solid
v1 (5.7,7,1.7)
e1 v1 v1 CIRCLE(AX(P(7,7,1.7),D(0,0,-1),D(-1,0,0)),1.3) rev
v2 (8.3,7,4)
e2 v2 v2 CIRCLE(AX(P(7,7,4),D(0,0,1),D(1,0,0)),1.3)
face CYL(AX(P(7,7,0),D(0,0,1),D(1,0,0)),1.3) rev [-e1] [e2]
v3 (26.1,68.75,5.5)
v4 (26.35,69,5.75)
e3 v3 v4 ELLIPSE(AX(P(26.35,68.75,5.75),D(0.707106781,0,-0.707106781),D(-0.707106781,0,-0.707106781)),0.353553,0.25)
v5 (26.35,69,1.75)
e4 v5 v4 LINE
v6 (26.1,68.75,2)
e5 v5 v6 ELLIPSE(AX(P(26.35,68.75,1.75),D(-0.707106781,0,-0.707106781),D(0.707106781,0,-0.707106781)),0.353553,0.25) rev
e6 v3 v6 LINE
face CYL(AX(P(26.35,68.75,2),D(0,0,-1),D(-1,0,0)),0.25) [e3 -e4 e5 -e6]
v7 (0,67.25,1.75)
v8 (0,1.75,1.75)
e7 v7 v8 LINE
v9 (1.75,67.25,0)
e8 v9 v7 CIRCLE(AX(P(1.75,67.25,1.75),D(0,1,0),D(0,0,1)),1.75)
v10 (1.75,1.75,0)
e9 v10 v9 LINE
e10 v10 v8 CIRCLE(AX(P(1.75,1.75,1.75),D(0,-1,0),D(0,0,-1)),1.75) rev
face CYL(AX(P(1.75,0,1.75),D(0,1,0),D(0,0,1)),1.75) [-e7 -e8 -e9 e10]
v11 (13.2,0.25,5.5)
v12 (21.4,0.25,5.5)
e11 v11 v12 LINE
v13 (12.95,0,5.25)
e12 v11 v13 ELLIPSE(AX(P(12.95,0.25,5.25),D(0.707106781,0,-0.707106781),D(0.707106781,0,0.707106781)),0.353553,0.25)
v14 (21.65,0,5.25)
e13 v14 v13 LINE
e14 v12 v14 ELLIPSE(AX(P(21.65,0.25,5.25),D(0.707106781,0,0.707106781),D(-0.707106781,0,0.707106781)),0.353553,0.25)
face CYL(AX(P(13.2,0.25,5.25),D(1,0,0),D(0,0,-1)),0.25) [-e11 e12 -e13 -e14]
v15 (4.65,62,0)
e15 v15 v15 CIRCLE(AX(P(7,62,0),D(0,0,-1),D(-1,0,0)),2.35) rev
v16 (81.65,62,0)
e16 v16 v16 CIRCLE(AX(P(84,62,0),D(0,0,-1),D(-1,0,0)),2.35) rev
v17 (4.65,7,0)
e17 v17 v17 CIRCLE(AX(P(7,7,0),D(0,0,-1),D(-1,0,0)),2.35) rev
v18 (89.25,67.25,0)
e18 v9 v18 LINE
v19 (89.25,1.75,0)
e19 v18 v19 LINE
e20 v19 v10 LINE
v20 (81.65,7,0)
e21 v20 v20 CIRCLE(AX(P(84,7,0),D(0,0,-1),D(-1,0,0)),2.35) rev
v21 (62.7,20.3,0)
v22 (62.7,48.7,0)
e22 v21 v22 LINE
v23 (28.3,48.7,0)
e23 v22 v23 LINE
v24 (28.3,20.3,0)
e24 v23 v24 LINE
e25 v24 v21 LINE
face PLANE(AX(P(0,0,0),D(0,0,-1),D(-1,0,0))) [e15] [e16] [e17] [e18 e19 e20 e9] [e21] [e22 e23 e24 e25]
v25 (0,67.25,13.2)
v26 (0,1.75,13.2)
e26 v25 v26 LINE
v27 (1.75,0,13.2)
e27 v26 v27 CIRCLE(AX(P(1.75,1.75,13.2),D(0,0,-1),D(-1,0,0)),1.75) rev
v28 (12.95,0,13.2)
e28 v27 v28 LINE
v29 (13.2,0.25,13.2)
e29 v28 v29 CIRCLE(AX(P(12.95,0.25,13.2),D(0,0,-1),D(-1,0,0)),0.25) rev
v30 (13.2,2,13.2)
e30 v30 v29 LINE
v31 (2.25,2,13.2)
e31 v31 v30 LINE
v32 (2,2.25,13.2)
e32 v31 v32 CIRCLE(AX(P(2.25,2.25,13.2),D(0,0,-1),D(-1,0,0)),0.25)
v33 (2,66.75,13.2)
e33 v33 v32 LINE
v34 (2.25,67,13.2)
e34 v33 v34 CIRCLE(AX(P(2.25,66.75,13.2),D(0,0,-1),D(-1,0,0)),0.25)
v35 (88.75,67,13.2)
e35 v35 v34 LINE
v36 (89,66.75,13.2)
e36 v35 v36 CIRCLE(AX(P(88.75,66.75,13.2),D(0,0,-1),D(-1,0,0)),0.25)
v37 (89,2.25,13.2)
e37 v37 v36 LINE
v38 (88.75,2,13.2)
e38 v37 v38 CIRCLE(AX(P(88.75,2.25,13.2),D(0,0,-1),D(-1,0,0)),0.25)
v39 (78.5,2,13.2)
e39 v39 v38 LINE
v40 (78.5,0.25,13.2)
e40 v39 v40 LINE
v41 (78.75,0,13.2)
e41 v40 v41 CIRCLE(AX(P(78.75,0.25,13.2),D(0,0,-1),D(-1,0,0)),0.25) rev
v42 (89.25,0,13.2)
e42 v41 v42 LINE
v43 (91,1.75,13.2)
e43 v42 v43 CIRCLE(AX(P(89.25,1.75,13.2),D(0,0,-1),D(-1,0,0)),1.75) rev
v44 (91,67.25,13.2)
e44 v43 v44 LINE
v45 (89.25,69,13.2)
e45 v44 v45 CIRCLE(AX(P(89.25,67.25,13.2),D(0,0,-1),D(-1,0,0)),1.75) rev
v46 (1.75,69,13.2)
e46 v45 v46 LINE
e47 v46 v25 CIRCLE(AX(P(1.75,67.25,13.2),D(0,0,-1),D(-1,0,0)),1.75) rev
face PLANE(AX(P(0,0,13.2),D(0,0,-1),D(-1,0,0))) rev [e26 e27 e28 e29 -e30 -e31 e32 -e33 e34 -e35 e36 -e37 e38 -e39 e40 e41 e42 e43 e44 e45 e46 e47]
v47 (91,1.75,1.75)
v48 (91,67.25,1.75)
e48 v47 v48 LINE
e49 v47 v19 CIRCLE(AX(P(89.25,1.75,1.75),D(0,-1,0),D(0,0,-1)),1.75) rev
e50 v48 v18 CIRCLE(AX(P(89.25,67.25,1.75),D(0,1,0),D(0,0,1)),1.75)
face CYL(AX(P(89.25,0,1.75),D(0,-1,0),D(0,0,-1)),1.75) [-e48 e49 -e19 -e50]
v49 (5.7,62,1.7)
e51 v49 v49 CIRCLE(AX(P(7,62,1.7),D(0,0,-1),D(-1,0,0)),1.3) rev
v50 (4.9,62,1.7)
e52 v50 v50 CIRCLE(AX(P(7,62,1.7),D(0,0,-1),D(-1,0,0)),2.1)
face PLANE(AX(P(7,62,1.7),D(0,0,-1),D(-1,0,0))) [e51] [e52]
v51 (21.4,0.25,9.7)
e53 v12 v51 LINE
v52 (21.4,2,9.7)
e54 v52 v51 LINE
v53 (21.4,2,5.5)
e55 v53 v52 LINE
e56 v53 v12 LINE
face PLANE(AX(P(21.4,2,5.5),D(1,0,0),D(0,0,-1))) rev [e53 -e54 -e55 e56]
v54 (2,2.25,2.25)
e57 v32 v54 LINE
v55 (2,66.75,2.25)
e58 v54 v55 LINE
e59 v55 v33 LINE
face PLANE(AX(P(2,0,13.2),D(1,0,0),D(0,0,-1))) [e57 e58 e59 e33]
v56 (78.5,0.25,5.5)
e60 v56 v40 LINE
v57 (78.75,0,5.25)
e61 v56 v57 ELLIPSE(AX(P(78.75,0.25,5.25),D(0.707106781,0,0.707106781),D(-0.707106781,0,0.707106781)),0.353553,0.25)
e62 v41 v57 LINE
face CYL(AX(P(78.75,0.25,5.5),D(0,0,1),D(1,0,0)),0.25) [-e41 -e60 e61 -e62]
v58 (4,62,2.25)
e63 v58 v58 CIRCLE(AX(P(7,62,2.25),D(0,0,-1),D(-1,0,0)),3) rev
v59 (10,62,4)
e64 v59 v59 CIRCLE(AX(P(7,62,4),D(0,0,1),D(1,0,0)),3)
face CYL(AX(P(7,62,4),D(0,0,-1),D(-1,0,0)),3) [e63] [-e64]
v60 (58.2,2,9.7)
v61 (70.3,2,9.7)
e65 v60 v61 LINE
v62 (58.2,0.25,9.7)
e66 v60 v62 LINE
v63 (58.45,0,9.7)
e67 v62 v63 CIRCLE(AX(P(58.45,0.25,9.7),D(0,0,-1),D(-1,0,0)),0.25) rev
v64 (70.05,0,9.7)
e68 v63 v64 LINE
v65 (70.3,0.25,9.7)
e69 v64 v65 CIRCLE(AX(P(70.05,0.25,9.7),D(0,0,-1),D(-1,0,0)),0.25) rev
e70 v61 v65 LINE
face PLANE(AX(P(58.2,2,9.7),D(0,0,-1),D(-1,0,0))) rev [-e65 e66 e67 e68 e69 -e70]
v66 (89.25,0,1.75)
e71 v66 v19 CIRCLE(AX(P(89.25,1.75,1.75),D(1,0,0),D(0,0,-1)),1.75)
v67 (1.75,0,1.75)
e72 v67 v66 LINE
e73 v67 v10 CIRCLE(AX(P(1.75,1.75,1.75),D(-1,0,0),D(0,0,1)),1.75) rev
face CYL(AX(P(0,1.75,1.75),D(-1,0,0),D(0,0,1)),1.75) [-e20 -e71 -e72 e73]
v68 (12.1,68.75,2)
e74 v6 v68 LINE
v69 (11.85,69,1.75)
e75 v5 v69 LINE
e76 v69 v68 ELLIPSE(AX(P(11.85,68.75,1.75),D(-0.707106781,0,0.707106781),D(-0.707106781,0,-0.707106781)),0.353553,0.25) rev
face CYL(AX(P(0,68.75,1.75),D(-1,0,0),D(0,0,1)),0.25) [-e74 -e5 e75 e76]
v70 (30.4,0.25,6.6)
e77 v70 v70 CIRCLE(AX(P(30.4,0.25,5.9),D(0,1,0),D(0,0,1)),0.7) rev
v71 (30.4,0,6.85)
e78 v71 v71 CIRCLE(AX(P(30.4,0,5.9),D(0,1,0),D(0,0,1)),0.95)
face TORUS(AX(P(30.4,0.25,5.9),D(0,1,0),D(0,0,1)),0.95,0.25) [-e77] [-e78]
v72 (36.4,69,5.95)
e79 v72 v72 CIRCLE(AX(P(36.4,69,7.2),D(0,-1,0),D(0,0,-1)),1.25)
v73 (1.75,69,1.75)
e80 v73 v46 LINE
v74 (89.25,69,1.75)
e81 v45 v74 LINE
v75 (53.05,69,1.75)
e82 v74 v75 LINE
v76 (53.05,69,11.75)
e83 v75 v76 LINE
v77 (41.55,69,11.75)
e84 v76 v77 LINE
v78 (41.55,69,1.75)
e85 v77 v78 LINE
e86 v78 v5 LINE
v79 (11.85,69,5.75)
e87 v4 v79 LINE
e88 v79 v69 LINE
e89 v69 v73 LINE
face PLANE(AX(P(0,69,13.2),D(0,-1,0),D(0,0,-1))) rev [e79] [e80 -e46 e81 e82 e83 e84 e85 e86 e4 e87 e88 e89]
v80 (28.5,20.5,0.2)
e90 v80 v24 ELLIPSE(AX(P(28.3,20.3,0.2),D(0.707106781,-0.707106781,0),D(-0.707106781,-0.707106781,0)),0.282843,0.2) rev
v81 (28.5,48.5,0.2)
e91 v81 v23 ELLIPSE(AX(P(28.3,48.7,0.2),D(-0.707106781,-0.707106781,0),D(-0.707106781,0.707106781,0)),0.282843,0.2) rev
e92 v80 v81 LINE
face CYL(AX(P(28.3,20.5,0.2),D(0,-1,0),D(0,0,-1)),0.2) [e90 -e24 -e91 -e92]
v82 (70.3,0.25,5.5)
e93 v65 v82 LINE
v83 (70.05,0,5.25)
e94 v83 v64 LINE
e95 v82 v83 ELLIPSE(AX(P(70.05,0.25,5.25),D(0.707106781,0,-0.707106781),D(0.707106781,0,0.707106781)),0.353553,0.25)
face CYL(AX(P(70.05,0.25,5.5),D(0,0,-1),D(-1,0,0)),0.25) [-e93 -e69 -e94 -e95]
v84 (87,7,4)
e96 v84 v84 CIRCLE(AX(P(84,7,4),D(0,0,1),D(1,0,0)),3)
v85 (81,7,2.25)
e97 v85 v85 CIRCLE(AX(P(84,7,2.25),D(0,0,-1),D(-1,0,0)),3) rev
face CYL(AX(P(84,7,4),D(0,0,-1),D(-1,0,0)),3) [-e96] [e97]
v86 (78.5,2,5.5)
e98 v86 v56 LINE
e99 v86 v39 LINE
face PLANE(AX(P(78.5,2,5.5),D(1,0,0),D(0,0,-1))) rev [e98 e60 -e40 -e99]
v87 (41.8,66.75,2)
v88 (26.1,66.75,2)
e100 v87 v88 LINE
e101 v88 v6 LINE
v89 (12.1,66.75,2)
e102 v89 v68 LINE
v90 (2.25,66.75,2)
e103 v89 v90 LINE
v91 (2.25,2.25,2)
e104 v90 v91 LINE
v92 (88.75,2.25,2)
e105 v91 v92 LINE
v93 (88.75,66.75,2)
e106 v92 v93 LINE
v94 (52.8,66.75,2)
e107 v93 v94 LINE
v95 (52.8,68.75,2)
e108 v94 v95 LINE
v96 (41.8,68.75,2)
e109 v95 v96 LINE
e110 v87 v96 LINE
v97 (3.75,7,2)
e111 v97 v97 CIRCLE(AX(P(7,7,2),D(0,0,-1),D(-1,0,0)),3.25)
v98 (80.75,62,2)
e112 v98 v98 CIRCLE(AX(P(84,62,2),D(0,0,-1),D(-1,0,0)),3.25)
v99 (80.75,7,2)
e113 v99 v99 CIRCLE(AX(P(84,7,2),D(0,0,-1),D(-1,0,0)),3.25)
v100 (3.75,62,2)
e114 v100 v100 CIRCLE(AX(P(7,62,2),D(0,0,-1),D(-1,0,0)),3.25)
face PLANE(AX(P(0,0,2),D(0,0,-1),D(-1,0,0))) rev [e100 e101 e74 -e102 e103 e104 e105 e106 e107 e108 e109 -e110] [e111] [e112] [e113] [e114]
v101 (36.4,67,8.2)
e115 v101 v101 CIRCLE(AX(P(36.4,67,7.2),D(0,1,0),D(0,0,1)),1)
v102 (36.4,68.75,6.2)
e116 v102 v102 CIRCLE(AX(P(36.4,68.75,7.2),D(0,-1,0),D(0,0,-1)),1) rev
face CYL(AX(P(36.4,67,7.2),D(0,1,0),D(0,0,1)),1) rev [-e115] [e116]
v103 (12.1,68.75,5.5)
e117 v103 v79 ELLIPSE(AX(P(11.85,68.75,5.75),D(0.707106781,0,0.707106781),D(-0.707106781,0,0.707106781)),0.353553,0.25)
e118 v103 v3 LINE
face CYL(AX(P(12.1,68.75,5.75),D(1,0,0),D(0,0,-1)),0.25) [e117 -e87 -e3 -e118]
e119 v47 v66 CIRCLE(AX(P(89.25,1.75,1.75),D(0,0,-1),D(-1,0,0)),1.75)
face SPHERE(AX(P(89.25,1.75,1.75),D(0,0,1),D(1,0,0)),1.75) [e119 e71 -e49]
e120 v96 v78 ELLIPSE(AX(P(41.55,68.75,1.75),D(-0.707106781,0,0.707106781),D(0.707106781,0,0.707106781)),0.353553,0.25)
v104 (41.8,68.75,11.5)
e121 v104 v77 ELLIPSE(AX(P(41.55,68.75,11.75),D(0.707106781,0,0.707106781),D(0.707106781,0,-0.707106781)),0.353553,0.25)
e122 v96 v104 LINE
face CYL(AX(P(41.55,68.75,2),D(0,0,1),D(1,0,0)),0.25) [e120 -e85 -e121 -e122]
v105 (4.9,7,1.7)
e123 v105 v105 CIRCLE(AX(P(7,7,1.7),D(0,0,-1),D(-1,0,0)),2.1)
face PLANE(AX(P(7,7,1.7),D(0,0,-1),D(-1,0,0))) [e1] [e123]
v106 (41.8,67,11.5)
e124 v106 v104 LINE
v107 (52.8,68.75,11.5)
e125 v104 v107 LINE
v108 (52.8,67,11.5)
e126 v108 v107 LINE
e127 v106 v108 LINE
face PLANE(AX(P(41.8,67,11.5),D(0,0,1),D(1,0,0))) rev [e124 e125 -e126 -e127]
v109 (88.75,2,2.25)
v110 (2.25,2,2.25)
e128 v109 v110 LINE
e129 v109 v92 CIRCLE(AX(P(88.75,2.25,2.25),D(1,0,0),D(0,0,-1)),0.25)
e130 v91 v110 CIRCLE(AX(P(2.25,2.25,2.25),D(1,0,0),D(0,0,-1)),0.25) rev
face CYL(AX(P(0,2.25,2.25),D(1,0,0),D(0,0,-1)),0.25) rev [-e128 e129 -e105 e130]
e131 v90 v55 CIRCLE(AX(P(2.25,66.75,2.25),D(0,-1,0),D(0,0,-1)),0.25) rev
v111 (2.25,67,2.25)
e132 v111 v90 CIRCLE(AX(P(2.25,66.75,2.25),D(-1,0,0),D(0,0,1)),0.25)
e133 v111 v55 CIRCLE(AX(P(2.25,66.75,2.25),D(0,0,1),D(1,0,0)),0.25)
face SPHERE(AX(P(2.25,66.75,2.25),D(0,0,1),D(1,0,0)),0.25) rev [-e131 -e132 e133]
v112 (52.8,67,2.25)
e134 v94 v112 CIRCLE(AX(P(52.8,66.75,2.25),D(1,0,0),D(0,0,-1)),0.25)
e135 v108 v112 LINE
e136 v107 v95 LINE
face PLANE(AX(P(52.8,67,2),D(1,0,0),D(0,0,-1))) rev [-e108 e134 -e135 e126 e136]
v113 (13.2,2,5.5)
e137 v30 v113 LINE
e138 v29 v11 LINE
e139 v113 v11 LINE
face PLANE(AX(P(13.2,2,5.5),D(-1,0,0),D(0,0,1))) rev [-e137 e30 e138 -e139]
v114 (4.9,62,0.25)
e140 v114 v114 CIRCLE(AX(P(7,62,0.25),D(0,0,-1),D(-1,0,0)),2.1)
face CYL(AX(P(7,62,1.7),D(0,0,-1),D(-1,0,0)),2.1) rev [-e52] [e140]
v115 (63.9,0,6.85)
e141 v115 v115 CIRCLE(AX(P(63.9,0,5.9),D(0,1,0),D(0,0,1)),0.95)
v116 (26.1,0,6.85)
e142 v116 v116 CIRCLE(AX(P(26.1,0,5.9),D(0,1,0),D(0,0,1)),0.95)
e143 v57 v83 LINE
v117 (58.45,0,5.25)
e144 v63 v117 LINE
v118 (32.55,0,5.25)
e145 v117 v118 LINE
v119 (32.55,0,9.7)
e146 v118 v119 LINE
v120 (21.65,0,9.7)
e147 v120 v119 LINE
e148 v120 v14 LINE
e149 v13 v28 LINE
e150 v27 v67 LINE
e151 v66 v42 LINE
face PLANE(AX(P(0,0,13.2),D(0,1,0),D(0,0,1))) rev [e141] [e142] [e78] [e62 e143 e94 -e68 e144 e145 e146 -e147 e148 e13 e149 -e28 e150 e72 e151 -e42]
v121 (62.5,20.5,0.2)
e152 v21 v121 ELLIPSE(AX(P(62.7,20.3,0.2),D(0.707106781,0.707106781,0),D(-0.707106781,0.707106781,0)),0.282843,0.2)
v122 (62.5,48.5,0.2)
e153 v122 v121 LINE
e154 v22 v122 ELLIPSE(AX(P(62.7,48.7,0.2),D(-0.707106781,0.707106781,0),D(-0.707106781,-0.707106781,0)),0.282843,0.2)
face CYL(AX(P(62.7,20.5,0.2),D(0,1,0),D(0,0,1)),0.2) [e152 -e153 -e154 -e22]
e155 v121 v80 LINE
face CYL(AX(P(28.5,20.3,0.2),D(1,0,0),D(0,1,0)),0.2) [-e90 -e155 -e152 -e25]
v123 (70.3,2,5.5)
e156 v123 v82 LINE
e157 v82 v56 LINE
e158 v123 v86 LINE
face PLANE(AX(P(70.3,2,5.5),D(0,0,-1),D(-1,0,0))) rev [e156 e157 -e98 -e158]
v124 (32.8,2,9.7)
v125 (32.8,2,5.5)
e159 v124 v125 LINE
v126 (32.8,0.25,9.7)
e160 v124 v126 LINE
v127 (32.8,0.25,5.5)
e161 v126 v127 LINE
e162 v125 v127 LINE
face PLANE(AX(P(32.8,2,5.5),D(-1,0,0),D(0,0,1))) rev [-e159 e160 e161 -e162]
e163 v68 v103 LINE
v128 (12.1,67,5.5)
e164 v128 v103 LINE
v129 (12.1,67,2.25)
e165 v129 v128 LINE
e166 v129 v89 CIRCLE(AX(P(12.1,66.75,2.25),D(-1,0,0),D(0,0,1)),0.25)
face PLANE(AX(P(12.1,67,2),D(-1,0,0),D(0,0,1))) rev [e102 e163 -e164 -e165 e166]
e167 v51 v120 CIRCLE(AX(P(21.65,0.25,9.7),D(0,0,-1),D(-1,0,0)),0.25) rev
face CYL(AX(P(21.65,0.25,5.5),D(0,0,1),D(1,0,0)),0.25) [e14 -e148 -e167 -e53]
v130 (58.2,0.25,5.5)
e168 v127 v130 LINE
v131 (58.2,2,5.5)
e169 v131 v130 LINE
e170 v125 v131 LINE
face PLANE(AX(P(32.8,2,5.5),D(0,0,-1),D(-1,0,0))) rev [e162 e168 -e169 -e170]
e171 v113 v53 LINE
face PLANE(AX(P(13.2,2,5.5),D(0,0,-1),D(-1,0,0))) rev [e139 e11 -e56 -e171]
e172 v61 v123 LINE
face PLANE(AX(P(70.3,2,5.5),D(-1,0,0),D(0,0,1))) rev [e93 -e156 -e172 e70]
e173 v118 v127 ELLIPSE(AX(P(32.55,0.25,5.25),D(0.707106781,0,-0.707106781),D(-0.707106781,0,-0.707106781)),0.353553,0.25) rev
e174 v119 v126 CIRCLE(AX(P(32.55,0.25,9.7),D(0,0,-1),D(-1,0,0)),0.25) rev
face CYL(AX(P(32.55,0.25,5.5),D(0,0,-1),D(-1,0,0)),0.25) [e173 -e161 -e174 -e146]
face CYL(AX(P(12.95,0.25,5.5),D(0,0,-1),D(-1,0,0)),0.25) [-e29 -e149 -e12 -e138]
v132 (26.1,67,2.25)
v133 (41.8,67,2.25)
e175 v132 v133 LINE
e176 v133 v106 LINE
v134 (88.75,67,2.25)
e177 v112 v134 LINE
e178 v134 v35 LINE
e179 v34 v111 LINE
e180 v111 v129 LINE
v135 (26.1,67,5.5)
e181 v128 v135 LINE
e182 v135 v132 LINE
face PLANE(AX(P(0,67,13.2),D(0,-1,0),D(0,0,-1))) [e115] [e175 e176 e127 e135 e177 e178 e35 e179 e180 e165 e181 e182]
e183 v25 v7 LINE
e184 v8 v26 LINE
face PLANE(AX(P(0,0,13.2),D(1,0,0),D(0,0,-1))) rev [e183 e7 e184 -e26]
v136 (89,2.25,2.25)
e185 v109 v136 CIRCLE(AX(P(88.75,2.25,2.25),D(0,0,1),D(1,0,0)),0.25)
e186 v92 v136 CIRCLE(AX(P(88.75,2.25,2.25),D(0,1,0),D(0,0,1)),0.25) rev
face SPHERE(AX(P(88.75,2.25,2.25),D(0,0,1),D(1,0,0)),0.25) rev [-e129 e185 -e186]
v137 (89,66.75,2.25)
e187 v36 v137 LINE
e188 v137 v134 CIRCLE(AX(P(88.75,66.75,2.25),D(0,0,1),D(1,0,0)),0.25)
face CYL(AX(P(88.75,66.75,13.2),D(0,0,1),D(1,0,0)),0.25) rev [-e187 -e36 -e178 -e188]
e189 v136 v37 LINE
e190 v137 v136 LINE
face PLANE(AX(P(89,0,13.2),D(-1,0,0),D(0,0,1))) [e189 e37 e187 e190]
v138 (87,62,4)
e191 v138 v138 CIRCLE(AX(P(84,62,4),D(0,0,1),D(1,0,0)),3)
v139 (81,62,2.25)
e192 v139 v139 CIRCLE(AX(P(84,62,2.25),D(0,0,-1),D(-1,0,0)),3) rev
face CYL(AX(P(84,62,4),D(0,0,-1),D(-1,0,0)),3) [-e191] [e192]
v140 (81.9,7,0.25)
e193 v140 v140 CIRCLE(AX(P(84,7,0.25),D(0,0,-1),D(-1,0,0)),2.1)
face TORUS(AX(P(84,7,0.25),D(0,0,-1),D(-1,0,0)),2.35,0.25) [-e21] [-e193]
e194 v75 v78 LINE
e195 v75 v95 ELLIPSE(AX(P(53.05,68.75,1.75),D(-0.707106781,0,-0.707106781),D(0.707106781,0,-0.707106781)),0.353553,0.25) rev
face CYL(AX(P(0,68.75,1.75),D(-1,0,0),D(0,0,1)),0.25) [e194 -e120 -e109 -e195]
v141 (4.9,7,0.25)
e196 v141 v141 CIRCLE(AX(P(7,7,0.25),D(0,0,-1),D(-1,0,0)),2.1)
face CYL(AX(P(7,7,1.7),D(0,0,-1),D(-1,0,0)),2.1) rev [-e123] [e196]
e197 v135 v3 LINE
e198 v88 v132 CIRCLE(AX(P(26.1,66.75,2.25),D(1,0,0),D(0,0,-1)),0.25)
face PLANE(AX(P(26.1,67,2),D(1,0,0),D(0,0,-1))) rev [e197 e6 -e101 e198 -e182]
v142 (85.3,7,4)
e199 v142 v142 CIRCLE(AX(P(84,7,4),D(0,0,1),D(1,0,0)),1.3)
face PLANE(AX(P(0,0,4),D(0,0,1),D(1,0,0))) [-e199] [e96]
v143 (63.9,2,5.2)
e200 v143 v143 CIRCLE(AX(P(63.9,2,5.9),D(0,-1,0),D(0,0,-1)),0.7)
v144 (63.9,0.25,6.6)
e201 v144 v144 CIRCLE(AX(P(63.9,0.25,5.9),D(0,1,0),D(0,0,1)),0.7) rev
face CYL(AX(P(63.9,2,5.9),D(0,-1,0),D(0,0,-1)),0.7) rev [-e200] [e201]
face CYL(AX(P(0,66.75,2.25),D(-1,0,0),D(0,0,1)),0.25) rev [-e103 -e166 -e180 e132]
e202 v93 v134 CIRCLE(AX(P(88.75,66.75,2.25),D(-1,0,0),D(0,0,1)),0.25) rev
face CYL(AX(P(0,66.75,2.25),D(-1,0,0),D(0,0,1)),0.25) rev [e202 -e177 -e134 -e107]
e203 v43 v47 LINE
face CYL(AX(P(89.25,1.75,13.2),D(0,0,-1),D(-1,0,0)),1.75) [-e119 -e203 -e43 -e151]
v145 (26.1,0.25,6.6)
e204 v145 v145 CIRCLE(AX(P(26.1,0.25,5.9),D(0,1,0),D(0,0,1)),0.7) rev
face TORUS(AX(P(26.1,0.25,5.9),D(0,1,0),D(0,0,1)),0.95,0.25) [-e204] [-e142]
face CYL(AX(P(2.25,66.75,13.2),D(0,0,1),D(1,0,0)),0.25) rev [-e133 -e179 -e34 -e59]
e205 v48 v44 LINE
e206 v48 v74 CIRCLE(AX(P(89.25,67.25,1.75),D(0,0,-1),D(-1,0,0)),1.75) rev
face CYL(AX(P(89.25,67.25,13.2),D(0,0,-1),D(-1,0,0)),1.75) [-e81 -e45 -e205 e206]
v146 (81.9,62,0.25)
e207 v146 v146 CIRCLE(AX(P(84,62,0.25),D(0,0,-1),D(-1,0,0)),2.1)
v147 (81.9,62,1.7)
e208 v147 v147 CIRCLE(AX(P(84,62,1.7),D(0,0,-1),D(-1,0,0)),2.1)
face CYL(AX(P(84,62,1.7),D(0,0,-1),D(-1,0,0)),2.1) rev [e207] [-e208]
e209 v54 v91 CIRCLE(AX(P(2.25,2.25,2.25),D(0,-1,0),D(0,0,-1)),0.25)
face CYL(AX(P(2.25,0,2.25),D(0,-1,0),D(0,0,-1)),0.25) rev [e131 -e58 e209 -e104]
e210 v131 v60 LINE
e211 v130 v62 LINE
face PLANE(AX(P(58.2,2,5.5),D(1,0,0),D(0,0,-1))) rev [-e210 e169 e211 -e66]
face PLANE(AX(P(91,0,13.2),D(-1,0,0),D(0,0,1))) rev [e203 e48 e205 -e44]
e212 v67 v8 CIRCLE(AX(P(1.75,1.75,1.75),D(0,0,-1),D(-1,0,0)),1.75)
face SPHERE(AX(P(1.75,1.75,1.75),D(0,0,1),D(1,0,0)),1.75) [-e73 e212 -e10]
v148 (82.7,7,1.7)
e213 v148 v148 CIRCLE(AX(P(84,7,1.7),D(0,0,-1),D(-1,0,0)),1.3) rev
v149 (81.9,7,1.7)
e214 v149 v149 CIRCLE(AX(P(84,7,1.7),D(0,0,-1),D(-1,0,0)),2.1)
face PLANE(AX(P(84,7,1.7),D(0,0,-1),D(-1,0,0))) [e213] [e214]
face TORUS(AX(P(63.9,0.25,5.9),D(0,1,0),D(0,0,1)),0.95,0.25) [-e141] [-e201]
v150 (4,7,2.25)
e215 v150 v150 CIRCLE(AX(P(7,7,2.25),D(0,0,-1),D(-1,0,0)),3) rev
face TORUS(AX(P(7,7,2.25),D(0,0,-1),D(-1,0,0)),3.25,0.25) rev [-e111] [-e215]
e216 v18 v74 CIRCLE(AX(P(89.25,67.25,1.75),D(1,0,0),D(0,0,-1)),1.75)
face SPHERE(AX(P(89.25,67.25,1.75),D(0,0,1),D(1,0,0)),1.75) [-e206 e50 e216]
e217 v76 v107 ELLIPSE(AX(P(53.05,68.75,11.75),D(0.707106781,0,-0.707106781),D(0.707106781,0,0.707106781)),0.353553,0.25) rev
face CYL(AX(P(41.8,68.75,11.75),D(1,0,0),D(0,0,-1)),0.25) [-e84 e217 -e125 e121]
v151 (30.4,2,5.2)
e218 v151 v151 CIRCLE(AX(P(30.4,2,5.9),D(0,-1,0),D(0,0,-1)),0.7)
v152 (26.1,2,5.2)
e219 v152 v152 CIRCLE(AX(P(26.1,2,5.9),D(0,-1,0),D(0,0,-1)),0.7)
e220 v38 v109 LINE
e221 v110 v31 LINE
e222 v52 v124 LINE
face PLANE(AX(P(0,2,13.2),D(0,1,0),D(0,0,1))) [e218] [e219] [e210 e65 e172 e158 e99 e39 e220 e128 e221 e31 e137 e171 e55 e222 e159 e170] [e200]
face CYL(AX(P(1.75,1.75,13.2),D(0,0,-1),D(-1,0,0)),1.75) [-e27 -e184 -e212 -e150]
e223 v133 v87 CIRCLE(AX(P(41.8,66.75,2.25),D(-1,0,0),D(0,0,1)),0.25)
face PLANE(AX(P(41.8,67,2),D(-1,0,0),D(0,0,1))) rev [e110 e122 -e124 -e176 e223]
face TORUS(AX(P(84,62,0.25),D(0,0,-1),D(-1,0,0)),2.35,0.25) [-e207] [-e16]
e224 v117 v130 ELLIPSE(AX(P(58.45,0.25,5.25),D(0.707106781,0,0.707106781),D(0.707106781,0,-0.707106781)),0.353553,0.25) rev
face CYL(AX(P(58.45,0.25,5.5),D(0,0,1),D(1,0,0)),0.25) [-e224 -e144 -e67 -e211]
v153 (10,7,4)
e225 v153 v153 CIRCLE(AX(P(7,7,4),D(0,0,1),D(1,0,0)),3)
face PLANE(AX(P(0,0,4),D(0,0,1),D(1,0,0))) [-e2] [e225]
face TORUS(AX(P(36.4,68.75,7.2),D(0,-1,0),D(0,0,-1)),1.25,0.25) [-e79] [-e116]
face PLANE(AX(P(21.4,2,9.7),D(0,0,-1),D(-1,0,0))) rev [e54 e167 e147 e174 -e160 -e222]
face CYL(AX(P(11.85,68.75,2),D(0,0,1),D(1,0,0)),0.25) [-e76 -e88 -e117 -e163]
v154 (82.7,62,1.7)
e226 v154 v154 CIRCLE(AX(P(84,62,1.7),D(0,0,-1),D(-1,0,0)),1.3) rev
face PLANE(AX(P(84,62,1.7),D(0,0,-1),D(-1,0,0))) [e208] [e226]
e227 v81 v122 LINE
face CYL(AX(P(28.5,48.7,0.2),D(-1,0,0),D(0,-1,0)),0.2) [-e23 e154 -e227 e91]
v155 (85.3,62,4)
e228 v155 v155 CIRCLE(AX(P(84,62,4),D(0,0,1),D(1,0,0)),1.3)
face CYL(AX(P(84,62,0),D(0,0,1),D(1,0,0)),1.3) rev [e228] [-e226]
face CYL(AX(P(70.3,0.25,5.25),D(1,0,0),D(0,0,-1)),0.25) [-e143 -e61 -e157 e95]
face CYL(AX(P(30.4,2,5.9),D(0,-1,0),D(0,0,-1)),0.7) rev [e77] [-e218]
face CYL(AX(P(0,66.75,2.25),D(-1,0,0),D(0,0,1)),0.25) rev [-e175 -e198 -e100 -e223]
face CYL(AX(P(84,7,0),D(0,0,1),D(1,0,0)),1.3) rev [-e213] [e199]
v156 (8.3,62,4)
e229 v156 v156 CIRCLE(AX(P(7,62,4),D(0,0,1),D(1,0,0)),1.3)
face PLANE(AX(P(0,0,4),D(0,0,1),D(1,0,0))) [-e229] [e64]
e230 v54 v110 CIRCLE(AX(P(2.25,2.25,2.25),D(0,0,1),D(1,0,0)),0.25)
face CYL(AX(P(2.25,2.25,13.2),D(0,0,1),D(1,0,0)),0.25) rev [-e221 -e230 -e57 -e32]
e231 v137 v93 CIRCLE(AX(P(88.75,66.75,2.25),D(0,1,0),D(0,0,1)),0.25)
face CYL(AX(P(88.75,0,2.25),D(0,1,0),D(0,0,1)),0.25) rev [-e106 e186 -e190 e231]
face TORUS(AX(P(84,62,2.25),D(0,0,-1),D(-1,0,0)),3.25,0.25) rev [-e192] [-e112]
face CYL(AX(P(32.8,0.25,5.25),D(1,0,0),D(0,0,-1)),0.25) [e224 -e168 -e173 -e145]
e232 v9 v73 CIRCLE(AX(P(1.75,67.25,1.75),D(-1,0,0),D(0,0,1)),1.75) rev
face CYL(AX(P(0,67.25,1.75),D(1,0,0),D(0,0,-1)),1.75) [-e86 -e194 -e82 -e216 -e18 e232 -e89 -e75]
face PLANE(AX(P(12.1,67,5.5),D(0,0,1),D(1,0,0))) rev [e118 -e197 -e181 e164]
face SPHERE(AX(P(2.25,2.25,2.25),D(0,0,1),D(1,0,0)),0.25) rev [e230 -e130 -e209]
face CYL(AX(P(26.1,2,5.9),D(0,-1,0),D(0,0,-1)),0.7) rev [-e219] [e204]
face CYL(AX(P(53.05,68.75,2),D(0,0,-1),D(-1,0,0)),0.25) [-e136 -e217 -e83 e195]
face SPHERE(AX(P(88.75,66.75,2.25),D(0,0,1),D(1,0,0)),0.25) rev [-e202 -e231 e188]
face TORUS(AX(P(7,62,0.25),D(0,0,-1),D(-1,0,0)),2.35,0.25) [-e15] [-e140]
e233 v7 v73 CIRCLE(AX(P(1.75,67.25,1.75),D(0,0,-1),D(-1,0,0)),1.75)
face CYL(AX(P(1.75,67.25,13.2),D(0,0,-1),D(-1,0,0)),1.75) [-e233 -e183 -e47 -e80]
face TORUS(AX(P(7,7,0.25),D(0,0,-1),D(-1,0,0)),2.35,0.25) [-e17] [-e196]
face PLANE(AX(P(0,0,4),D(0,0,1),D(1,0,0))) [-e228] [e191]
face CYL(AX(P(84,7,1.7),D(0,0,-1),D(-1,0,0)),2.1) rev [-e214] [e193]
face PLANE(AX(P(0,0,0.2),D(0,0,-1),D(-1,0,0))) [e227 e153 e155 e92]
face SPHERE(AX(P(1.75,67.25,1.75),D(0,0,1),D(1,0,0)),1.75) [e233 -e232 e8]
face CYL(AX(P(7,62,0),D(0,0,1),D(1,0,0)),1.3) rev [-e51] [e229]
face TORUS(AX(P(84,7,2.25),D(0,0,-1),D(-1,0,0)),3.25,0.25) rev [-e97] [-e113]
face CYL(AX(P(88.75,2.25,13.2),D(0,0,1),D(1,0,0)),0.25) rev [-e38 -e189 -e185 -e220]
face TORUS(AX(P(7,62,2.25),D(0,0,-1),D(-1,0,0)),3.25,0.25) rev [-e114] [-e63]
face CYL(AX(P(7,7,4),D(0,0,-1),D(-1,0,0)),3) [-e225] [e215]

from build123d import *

# Parameters (mm, degrees)
SKETCH1_W           = 91
SKETCH1_H           = 69
BOSS_EXTRUDE1_DEPTH = 13.2
SHELL2_T            = -2
BOSS_EXTRUDE2_DEPTH = 2
SKETCH3_R           = 1.3
CUT_EXTRUDE1_DEPTH  = 4
SKETCH5_R           = 2.1
CUT_EXTRUDE2_DEPTH  = 1.7
SKETCH6_W           = 8.2
SKETCH6_H           = 7.7
SKETCH6_W_2         = 25.4
CUT_EXTRUDE3_DEPTH  = 2
SKETCH7_R           = 0.7
CUT_EXTRUDE4_DEPTH  = 2
SKETCH8_W           = 14
SKETCH8_H           = 3.5
SKETCH8_W_2         = 11
SKETCH8_H_2         = 9.5
CUT_EXTRUDE5_DEPTH  = 2
SKETCH9_R           = 1
CUT_EXTRUDE6_DEPTH  = 2
SKETCH10_W          = 11.4
SKETCH10_H          = 3.5
SKETCH10_W_2        = 12.1
CUT_EXTRUDE8_DEPTH  = 2
FILLET1_R           = 1.75
FILLET2_R           = 0.25
FILLET3_R           = 0.25
FILLET4_R           = 0.25
SKETCH12_W          = 34
SKETCH12_H          = 28
CUT_EXTRUDE9_DEPTH  = 0.2
FILLET5_R           = 0.2


# Some blends are built 0.0001 mm under size
with BuildPart() as part:
    # Sketch1 → Boss-Extrude1 (new body)
    with BuildSketch(Plane.XY):
        with Locations((45.5, 34.5)):
            Rectangle(SKETCH1_W, SKETCH1_H)
    extrude(amount=BOSS_EXTRUDE1_DEPTH)

    # Shell2
    shell2_openings = [part.faces().sort_by_distance(p)[0] for p in [
        (45.5, 34.5, 13.2),
    ]]
    offset(amount=SHELL2_T, openings=shell2_openings, kind=Kind.INTERSECTION)

    # Sketch2 → Boss-Extrude2 (add)
    with BuildSketch(Plane.XY.offset(2)):
        with BuildLine():
            ThreePointArc((4, 7), (4.878679656, 4.878679656), (7, 4))
            Line((7, 4), (7, 7))
            Line((7, 7), (4, 7))
        make_face()
        with BuildLine():
            Line((7, 7), (7, 4))
            ThreePointArc((7, 4), (9.121320344, 4.878679656), (10, 7))
            ThreePointArc((10, 7), (7, 10), (4, 7))
            Line((4, 7), (7, 7))
        make_face()
        with BuildLine():
            ThreePointArc((10, 62), (9.121320344, 64.121320344), (7, 65))
            Line((7, 65), (7, 62))
            Line((7, 62), (4, 62))
            ThreePointArc((4, 62), (7, 59), (10, 62))
        make_face()
        with BuildLine():
            Line((7, 62), (7, 65))
            ThreePointArc((7, 65), (4.878679656, 64.121320344), (4, 62))
            Line((4, 62), (7, 62))
        make_face()
        with BuildLine():
            ThreePointArc((87, 62), (86.121320344, 64.121320344), (84, 65))
            Line((84, 65), (84, 62))
            Line((84, 62), (87, 62))
        make_face()
        with BuildLine():
            Line((84, 62), (84, 65))
            ThreePointArc((84, 65), (81.878679656, 59.878679656), (87, 62))
            Line((87, 62), (84, 62))
        make_face()
        with BuildLine():
            ThreePointArc((87, 7), (81.878679656, 9.121320344), (84, 4))
            Line((84, 4), (84, 7))
            Line((84, 7), (87, 7))
        make_face()
        with BuildLine():
            Line((84, 7), (84, 4))
            ThreePointArc((84, 4), (86.121320344, 4.878679656), (87, 7))
            Line((87, 7), (84, 7))
        make_face()
    extrude(amount=BOSS_EXTRUDE2_DEPTH)

    # Sketch3 → Cut-Extrude1 (cut)
    with BuildSketch(Plane.XY.offset(4)):
        with Locations((7, 62)):
            Circle(SKETCH3_R)
        with Locations((84, 62)):
            Circle(SKETCH3_R)
        with Locations((84, 7)):
            Circle(SKETCH3_R)
        with Locations((7, 7)):
            Circle(SKETCH3_R)
    extrude(amount=-CUT_EXTRUDE1_DEPTH, mode=Mode.SUBTRACT)

    # Sketch5 → Cut-Extrude2 (cut)
    with BuildSketch(Plane(origin=(0, 0, 0), x_dir=(-1, 0, 0), z_dir=(0, 0, -1))):
        with Locations((-84, 62)):
            Circle(SKETCH5_R)
        with Locations((-7, 62)):
            Circle(SKETCH5_R)
        with Locations((-7, 7)):
            Circle(SKETCH5_R)
        with Locations((-84, 7)):
            Circle(SKETCH5_R)
    extrude(amount=-CUT_EXTRUDE2_DEPTH, mode=Mode.SUBTRACT)

    # Sketch6 → Cut-Extrude3 (cut)
    with BuildSketch(Plane(origin=(0, 0, 0), x_dir=(-1, 0, 0), z_dir=(0, -1, 0))):
        with Locations((-17.3, -9.35)):
            Rectangle(SKETCH6_W, SKETCH6_H)
        with Locations((-74.4, -9.35)):
            Rectangle(SKETCH6_W, SKETCH6_H)
        with Locations((-45.5, -9.35)):
            Rectangle(SKETCH6_W_2, SKETCH6_H)
    extrude(amount=-CUT_EXTRUDE3_DEPTH, mode=Mode.SUBTRACT)

    # Sketch7 → Cut-Extrude4 (cut)
    with BuildSketch(Plane(origin=(0, 0, 0), x_dir=(-1, 0, 0), z_dir=(0, -1, 0))):
        with Locations(Location((-26.1, -5.9, 0), (0, 0, 90))):
            Circle(SKETCH7_R)
        with Locations(Location((-30.4, -5.9, 0), (0, 0, 90))):
            Circle(SKETCH7_R)
        with Locations(Location((-63.9, -5.9, 0), (0, 0, 90))):
            Circle(SKETCH7_R)
    extrude(amount=-CUT_EXTRUDE4_DEPTH, mode=Mode.SUBTRACT)

    # Sketch8 → Cut-Extrude5 (cut)
    with BuildSketch(Plane(origin=(0, 69, 0), x_dir=(1, 0, 0), z_dir=(0, 1, 0))):
        with Locations((19.1, -3.75)):
            Rectangle(SKETCH8_W, SKETCH8_H)
        with Locations((47.3, -6.75)):
            Rectangle(SKETCH8_W_2, SKETCH8_H_2)
    extrude(amount=-CUT_EXTRUDE5_DEPTH, mode=Mode.SUBTRACT)

    # Sketch9 → Cut-Extrude6 (cut)
    with BuildSketch(Plane(origin=(0, 69, 0), x_dir=(1, 0, 0), z_dir=(0, 1, 0))):
        with Locations(Location((36.4, -7.2, 0), (0, 0, 270))):
            Circle(SKETCH9_R)
    extrude(amount=-CUT_EXTRUDE6_DEPTH, mode=Mode.SUBTRACT)

    # Sketch10 → Cut-Extrude8 (cut)
    with BuildSketch(Plane(origin=(0, 0, 0), x_dir=(-1, 0, 0), z_dir=(0, -1, 0))):
        with Locations((-27.1, -11.45)):
            Rectangle(SKETCH10_W, SKETCH10_H)
        with Locations((-64.25, -11.45)):
            Rectangle(SKETCH10_W_2, SKETCH10_H)
    extrude(amount=-CUT_EXTRUDE8_DEPTH, mode=Mode.SUBTRACT)

    # Fillet1
    fillet1_edges = [part.edges().sort_by_distance(p)[0] for p in [
        (45.5, 69, 0),
        (91, 34.5, 0),
        (45.5, 0, 0),
        (0, 34.5, 0),
        (0, 69, 6.6),
        (91, 69, 6.6),
        (91, 0, 6.6),
        (0, 0, 6.6),
    ]]
    fillet(fillet1_edges, radius=FILLET1_R)

    # Fillet2
    fillet2_edges = [part.edges().sort_by_distance(p)[0] for p in [
        (13.2, 0, 9.35),
        (17.3, 0, 5.5),
        (21.4, 0, 7.6),
        (74.4, 0, 5.5),
        (78.5, 0, 9.35),
        (45.5, 0, 5.5),
        (58.2, 0, 7.6),
        (26.1, 0, 6.6),
        (30.4, 0, 6.6),
        (63.9, 0, 6.6),
        (12.1, 69, 3.75),
        (19.1, 69, 5.5),
        (26.1, 69, 3.75),
        (19.1, 69, 2),
        (41.8, 69, 6.75),
        (47.3, 69, 11.5),
        (52.8, 69, 6.75),
        (47.3, 69, 2),
        (36.4, 69, 6.2),
        (70.3, 0, 7.6),
        (32.8, 0, 7.6),
        (86.1, 7, 0),
        (9.1, 7, 0),
        (9.1, 62, 0),
        (86.1, 62, 0),
    ]]
    fillet(fillet2_edges, radius=FILLET2_R - 0.0001)  # a hair under: the kernel refuses the full size

    # Fillet3
    fillet3_edges = [part.edges().sort_by_distance(p)[0] for p in [
        (33.95, 67, 2),
        (7.05, 67, 2),
        (2, 34.5, 2),
        (45.5, 2, 2),
        (89, 34.5, 2),
        (70.9, 67, 2),
        (10, 7, 2),
        (7, 59, 2),
        (81, 62, 2),
        (84, 10, 2),
    ]]
    fillet(fillet3_edges, radius=FILLET3_R)

    # Fillet4
    # the kernel refuses this fillet: 0.25 mm, written as the material it adds along each edge
    with BuildSketch(Plane(origin=(2.25, 66.75, 2.25), x_dir=(-1, 0, 0), z_dir=(0, 1, 0))) as fillet4_piece_1_section:
        Polygon((0, 0), (FILLET4_R, 0), (FILLET4_R, -FILLET4_R), (0, -FILLET4_R), align=None)
    fillet4_piece_1 = extrude(amount=FILLET4_R, mode=Mode.PRIVATE)
    fillet4_piece_1 = fillet4_piece_1 - Plane(origin=(2.25, 66.75, 2.25), x_dir=(0.7071067811865475, 0, 0.7071067811865475), z_dir=(0, 1, 0)) * Sphere(FILLET4_R, mode=Mode.PRIVATE)
    add(fillet4_piece_1)
    with BuildSketch(Plane(origin=(88.75, 66.75, 2.25), x_dir=(1, 0, 0), z_dir=(0, 1, 0))) as fillet4_piece_2_section:
        Polygon((0, 0), (FILLET4_R, 0), (FILLET4_R, FILLET4_R), (0, FILLET4_R), align=None)
    fillet4_piece_2 = extrude(amount=FILLET4_R, mode=Mode.PRIVATE)
    fillet4_piece_2 = fillet4_piece_2 - Plane(origin=(88.75, 66.75, 2.25), x_dir=(-0.7071067811865475, 0, 0.7071067811865475), z_dir=(0, 1, 0)) * Sphere(FILLET4_R, mode=Mode.PRIVATE)
    add(fillet4_piece_2)
    with BuildSketch(Plane(origin=(2.25, 2.25, 2.25), x_dir=(-1, 0, 0), z_dir=(0, -1, 0))) as fillet4_piece_3_section:
        Polygon((0, 0), (FILLET4_R, 0), (FILLET4_R, FILLET4_R), (0, FILLET4_R), align=None)
    fillet4_piece_3 = extrude(amount=FILLET4_R, mode=Mode.PRIVATE)
    fillet4_piece_3 = fillet4_piece_3 - Plane(origin=(2.25, 2.25, 2.25), x_dir=(0.7071067811865475, 0, 0.7071067811865475), z_dir=(0, -1, 0)) * Sphere(FILLET4_R, mode=Mode.PRIVATE)
    add(fillet4_piece_3)
    with BuildSketch(Plane(origin=(88.75, 2.25, 2.25), x_dir=(1, 0, 0), z_dir=(0, -1, 0))) as fillet4_piece_4_section:
        Polygon((0, 0), (FILLET4_R, 0), (FILLET4_R, -FILLET4_R), (0, -FILLET4_R), align=None)
    fillet4_piece_4 = extrude(amount=FILLET4_R, mode=Mode.PRIVATE)
    fillet4_piece_4 = fillet4_piece_4 - Plane(origin=(88.75, 2.25, 2.25), x_dir=(-0.7071067811865475, 0, 0.7071067811865475), z_dir=(0, -1, 0)) * Sphere(FILLET4_R, mode=Mode.PRIVATE)
    add(fillet4_piece_4)
    with BuildSketch(Plane(origin=(2, 67, 2.25), x_dir=(1, 0, 0), z_dir=(0, 0, 1)), Plane(origin=(2, 2, 13.2), x_dir=(1, 0, 0), z_dir=(0, 0, -1)), Plane(origin=(89, 2, 2.25), x_dir=(-1, 0, 0), z_dir=(0, 0, 1))) as fillet4_piece_5:
        with BuildLine():
            CenterArc((FILLET4_R, -FILLET4_R), FILLET4_R, 90, 90)
            Line((0, -FILLET4_R), (0, 0))
            Line((0, 0), (FILLET4_R, 0))
        make_face()
    extrude(amount=10.95)
    with BuildSketch(Plane(origin=(89, 67, 2.25), x_dir=(-1, 0, 0), z_dir=(0, 0, 1))) as fillet4_piece_6:
        with BuildLine():
            CenterArc((FILLET4_R, FILLET4_R), FILLET4_R, 180, 90)
            Line((0, FILLET4_R), (0, 0))
            Line((0, 0), (FILLET4_R, 0))
        make_face()
    extrude(amount=10.95)

    # Sketch12 → Cut-Extrude9 (cut)
    with BuildSketch(Plane(origin=(0, 0, 0), x_dir=(-1, 0, 0), z_dir=(0, 0, -1))):
        with Locations((-45.5, 34.5)):
            Rectangle(SKETCH12_W, SKETCH12_H)
    extrude(amount=-CUT_EXTRUDE9_DEPTH, mode=Mode.SUBTRACT)

    # Fillet5
    fillet5_edges = [part.edges().sort_by_distance(p)[0] for p in [
        (45.5, 48.5, 0),
        (62.5, 34.5, 0),
        (28.5, 34.5, 0),
        (45.5, 20.5, 0),
    ]]
    fillet(fillet5_edges, radius=FILLET5_R - 0.0001)  # a hair under: the kernel refuses the full size


solid = part.part
